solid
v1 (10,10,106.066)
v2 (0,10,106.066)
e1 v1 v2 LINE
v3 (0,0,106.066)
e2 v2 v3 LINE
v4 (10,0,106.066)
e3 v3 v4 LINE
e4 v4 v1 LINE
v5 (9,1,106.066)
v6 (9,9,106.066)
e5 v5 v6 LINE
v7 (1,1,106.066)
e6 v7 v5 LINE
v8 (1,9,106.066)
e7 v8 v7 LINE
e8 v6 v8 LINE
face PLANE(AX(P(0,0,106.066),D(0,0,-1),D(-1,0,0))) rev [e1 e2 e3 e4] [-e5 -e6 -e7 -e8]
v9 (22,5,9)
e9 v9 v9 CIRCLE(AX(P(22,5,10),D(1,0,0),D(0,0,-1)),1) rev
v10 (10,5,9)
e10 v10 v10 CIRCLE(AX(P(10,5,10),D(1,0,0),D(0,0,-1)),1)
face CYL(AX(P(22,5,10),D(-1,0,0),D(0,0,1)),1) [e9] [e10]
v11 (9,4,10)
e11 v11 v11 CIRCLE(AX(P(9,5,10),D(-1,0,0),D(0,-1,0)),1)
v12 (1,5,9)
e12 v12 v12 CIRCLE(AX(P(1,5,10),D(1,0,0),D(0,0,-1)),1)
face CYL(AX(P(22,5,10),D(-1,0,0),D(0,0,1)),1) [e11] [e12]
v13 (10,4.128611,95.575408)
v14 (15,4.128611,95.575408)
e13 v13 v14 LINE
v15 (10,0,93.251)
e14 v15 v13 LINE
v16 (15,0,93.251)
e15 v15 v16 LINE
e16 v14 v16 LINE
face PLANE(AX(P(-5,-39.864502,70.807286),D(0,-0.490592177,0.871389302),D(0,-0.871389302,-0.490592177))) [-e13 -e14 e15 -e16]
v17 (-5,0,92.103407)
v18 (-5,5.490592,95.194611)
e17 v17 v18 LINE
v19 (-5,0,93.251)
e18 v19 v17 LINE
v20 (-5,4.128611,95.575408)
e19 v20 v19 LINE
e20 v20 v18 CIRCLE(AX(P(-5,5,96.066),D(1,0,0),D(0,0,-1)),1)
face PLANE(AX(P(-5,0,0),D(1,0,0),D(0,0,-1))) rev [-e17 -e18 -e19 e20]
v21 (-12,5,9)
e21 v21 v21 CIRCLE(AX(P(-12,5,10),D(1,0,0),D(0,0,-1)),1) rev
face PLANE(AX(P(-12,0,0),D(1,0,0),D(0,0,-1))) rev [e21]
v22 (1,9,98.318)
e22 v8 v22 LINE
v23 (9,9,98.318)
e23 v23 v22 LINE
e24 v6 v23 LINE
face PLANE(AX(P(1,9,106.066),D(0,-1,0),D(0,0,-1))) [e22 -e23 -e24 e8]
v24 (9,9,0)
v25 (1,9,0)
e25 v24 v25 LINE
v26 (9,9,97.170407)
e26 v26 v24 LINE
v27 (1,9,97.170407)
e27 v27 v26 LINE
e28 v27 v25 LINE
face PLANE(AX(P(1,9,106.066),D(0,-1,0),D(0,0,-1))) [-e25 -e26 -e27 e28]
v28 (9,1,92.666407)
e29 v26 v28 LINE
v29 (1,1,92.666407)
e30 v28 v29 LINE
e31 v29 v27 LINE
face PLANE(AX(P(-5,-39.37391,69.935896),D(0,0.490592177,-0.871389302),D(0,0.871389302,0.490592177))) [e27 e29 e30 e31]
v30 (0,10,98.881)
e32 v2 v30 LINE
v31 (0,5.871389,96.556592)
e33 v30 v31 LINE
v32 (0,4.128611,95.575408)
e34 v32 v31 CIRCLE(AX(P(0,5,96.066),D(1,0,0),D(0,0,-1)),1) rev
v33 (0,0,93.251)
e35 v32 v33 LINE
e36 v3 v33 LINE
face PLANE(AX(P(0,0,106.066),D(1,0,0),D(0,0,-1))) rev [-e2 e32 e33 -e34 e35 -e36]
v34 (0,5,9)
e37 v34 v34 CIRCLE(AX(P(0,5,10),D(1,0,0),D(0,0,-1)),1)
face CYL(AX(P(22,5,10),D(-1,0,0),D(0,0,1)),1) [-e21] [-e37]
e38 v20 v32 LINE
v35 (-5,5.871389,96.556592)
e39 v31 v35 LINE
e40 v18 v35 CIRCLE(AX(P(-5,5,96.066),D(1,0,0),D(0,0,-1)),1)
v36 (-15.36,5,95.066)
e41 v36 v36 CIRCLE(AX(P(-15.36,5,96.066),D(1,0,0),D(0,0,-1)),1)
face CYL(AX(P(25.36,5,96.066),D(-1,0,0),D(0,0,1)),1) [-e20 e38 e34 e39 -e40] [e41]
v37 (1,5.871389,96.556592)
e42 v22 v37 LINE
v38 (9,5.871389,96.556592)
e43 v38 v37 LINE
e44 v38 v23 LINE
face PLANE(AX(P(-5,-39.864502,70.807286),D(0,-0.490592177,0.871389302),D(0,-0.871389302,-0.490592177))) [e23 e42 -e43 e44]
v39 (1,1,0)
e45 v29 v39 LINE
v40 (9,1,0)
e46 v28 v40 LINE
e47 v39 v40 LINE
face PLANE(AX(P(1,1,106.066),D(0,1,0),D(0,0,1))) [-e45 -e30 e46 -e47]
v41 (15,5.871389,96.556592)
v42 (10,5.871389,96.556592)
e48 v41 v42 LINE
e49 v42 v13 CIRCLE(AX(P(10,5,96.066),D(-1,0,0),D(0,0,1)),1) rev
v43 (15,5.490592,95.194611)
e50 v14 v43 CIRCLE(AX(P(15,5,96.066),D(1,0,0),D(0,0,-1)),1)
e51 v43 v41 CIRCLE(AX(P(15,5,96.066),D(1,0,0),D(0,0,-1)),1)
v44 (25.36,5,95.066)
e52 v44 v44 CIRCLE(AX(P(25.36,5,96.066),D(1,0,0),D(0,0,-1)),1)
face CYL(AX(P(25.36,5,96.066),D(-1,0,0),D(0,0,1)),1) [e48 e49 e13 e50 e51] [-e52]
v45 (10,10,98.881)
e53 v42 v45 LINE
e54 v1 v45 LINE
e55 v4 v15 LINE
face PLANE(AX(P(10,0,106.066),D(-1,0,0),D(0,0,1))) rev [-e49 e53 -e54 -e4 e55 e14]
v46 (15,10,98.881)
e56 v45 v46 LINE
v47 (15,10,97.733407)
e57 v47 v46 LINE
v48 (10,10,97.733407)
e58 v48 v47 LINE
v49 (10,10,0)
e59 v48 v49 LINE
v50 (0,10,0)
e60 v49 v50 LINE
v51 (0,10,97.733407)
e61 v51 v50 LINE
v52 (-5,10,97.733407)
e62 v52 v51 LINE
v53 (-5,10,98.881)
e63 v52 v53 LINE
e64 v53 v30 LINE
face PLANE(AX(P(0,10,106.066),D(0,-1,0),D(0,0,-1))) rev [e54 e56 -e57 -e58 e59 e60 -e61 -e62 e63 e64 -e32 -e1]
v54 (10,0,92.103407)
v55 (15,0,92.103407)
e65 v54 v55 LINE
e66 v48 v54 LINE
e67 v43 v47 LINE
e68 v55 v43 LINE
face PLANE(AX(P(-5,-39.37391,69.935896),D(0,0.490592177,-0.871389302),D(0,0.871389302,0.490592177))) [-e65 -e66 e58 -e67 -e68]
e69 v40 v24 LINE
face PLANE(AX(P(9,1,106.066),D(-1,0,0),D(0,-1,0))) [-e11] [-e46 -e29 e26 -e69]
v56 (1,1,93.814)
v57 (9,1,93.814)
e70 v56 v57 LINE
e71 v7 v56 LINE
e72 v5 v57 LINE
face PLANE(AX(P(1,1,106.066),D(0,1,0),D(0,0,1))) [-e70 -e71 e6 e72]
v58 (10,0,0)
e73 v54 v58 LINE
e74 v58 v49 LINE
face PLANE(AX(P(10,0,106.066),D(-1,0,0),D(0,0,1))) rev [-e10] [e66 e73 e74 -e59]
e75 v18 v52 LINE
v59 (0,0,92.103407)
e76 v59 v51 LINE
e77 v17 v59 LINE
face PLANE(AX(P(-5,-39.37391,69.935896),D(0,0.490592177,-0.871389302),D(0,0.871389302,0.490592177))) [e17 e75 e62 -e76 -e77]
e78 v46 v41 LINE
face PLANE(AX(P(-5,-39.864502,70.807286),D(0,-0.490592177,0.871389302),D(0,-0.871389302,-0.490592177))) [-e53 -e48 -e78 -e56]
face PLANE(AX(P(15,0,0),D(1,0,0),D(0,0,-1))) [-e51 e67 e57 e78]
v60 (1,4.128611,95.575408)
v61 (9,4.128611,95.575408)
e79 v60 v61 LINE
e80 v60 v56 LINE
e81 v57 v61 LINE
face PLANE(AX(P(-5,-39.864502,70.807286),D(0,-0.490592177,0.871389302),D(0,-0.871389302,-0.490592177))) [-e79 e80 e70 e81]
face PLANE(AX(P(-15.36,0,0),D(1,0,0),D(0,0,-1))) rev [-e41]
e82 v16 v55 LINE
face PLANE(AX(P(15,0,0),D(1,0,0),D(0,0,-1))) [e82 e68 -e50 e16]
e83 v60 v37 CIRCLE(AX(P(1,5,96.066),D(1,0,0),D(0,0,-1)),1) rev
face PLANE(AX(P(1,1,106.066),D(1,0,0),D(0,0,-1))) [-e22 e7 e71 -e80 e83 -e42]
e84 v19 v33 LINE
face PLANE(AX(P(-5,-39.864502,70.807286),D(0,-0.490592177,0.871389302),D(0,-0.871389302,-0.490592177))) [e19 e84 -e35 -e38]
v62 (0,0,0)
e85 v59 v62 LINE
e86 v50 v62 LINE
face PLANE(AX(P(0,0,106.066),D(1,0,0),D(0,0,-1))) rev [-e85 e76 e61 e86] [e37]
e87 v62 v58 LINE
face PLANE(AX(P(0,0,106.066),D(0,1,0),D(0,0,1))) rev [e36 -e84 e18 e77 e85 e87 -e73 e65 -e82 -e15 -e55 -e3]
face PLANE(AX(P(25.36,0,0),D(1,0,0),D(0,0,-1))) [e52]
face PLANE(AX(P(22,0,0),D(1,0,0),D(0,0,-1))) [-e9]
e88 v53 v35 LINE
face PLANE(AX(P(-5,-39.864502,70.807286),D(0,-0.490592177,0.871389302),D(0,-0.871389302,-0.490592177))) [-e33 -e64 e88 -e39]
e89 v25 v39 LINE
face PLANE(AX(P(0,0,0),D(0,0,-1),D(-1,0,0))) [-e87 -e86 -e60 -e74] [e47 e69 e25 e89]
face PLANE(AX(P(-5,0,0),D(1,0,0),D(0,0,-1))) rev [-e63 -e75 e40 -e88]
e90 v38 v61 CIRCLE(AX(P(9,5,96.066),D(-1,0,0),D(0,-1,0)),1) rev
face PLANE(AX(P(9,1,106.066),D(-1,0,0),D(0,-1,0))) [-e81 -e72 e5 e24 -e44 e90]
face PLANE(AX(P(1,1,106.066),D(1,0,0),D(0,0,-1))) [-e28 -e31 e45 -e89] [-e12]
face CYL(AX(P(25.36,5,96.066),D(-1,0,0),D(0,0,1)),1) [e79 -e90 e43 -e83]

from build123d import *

# Parameters (mm, degrees)
SKETCH_1_W           = 10
SKETCH_1_H           = 10
SKETCH_1_W_2         = 8
SKETCH_1_H_2         = 8
EXTRUDE_1_DEPTH      = 106.066
SKETCH_2_R           = 1
CUT_EXTRUDE_1_DEPTH  = 10
EXTRUDE_3_DEPTH      = 12
EXTRUDE_3_DEPTH_BACK = 22
SKETCH_5_R           = 1
EXTRUDE_7_DEPTH      = 15.36
EXTRUDE_7_DEPTH_BACK = 25.36
SKETCH_9_R           = 1
EXTRUDE_8_DEPTH      = 5
EXTRUDE_8_DEPTH_BACK = 15


with BuildPart() as part:
    # 草图1 → 凸台-拉伸1 (new body)
    with BuildSketch(Plane.XY):
        with Locations((5, 5)):
            Rectangle(SKETCH_1_W, SKETCH_1_H)
        with Locations((5, 5)):
            Rectangle(SKETCH_1_W_2, SKETCH_1_H_2, mode=Mode.SUBTRACT)
    extrude(amount=EXTRUDE_1_DEPTH)

    # 草图2 → 切除-拉伸1 (cut)
    with BuildSketch(Plane(origin=(10, 0, 0), x_dir=(0, 0, -1), z_dir=(1, 0, 0))):
        with Locations((-10, 5)):
            Circle(SKETCH_2_R)
    extrude(amount=-CUT_EXTRUDE_1_DEPTH, mode=Mode.SUBTRACT)

    # 草图5 → 凸台-拉伸3 (add, two sides: drawn at the far end of the back side and taken through both)
    with BuildSketch(Plane(origin=(10, 0, 0), x_dir=(0, 0, -1), z_dir=(1, 0, 0)).offset(-EXTRUDE_3_DEPTH_BACK)):
        with Locations((-10, 5)):
            Circle(SKETCH_5_R)
    extrude(amount=EXTRUDE_3_DEPTH + EXTRUDE_3_DEPTH_BACK)

    # 草图9 → 凸台-拉伸7 (add, two sides: drawn at the far end of the back side and taken through both)
    with BuildSketch(Plane(origin=(10, 0, 0), x_dir=(0, 0, -1), z_dir=(1, 0, 0)).offset(-EXTRUDE_7_DEPTH_BACK)):
        with Locations((-96.066, 5)):
            Circle(SKETCH_9_R)
    extrude(amount=EXTRUDE_7_DEPTH + EXTRUDE_7_DEPTH_BACK)

    # 草图10 → 凸台-拉伸8 (add, two sides: drawn at the far end of the back side and taken through both)
    with BuildSketch(Plane(origin=(10, 0, 0), x_dir=(0, 0, -1), z_dir=(1, 0, 0)).offset(-EXTRUDE_8_DEPTH_BACK)):
        Polygon((-93.251, 0), (-92.103407302, 0), (-97.733407302, 10), (-98.881, 10), align=None)
    extrude(amount=EXTRUDE_8_DEPTH + EXTRUDE_8_DEPTH_BACK)


solid = part.part
